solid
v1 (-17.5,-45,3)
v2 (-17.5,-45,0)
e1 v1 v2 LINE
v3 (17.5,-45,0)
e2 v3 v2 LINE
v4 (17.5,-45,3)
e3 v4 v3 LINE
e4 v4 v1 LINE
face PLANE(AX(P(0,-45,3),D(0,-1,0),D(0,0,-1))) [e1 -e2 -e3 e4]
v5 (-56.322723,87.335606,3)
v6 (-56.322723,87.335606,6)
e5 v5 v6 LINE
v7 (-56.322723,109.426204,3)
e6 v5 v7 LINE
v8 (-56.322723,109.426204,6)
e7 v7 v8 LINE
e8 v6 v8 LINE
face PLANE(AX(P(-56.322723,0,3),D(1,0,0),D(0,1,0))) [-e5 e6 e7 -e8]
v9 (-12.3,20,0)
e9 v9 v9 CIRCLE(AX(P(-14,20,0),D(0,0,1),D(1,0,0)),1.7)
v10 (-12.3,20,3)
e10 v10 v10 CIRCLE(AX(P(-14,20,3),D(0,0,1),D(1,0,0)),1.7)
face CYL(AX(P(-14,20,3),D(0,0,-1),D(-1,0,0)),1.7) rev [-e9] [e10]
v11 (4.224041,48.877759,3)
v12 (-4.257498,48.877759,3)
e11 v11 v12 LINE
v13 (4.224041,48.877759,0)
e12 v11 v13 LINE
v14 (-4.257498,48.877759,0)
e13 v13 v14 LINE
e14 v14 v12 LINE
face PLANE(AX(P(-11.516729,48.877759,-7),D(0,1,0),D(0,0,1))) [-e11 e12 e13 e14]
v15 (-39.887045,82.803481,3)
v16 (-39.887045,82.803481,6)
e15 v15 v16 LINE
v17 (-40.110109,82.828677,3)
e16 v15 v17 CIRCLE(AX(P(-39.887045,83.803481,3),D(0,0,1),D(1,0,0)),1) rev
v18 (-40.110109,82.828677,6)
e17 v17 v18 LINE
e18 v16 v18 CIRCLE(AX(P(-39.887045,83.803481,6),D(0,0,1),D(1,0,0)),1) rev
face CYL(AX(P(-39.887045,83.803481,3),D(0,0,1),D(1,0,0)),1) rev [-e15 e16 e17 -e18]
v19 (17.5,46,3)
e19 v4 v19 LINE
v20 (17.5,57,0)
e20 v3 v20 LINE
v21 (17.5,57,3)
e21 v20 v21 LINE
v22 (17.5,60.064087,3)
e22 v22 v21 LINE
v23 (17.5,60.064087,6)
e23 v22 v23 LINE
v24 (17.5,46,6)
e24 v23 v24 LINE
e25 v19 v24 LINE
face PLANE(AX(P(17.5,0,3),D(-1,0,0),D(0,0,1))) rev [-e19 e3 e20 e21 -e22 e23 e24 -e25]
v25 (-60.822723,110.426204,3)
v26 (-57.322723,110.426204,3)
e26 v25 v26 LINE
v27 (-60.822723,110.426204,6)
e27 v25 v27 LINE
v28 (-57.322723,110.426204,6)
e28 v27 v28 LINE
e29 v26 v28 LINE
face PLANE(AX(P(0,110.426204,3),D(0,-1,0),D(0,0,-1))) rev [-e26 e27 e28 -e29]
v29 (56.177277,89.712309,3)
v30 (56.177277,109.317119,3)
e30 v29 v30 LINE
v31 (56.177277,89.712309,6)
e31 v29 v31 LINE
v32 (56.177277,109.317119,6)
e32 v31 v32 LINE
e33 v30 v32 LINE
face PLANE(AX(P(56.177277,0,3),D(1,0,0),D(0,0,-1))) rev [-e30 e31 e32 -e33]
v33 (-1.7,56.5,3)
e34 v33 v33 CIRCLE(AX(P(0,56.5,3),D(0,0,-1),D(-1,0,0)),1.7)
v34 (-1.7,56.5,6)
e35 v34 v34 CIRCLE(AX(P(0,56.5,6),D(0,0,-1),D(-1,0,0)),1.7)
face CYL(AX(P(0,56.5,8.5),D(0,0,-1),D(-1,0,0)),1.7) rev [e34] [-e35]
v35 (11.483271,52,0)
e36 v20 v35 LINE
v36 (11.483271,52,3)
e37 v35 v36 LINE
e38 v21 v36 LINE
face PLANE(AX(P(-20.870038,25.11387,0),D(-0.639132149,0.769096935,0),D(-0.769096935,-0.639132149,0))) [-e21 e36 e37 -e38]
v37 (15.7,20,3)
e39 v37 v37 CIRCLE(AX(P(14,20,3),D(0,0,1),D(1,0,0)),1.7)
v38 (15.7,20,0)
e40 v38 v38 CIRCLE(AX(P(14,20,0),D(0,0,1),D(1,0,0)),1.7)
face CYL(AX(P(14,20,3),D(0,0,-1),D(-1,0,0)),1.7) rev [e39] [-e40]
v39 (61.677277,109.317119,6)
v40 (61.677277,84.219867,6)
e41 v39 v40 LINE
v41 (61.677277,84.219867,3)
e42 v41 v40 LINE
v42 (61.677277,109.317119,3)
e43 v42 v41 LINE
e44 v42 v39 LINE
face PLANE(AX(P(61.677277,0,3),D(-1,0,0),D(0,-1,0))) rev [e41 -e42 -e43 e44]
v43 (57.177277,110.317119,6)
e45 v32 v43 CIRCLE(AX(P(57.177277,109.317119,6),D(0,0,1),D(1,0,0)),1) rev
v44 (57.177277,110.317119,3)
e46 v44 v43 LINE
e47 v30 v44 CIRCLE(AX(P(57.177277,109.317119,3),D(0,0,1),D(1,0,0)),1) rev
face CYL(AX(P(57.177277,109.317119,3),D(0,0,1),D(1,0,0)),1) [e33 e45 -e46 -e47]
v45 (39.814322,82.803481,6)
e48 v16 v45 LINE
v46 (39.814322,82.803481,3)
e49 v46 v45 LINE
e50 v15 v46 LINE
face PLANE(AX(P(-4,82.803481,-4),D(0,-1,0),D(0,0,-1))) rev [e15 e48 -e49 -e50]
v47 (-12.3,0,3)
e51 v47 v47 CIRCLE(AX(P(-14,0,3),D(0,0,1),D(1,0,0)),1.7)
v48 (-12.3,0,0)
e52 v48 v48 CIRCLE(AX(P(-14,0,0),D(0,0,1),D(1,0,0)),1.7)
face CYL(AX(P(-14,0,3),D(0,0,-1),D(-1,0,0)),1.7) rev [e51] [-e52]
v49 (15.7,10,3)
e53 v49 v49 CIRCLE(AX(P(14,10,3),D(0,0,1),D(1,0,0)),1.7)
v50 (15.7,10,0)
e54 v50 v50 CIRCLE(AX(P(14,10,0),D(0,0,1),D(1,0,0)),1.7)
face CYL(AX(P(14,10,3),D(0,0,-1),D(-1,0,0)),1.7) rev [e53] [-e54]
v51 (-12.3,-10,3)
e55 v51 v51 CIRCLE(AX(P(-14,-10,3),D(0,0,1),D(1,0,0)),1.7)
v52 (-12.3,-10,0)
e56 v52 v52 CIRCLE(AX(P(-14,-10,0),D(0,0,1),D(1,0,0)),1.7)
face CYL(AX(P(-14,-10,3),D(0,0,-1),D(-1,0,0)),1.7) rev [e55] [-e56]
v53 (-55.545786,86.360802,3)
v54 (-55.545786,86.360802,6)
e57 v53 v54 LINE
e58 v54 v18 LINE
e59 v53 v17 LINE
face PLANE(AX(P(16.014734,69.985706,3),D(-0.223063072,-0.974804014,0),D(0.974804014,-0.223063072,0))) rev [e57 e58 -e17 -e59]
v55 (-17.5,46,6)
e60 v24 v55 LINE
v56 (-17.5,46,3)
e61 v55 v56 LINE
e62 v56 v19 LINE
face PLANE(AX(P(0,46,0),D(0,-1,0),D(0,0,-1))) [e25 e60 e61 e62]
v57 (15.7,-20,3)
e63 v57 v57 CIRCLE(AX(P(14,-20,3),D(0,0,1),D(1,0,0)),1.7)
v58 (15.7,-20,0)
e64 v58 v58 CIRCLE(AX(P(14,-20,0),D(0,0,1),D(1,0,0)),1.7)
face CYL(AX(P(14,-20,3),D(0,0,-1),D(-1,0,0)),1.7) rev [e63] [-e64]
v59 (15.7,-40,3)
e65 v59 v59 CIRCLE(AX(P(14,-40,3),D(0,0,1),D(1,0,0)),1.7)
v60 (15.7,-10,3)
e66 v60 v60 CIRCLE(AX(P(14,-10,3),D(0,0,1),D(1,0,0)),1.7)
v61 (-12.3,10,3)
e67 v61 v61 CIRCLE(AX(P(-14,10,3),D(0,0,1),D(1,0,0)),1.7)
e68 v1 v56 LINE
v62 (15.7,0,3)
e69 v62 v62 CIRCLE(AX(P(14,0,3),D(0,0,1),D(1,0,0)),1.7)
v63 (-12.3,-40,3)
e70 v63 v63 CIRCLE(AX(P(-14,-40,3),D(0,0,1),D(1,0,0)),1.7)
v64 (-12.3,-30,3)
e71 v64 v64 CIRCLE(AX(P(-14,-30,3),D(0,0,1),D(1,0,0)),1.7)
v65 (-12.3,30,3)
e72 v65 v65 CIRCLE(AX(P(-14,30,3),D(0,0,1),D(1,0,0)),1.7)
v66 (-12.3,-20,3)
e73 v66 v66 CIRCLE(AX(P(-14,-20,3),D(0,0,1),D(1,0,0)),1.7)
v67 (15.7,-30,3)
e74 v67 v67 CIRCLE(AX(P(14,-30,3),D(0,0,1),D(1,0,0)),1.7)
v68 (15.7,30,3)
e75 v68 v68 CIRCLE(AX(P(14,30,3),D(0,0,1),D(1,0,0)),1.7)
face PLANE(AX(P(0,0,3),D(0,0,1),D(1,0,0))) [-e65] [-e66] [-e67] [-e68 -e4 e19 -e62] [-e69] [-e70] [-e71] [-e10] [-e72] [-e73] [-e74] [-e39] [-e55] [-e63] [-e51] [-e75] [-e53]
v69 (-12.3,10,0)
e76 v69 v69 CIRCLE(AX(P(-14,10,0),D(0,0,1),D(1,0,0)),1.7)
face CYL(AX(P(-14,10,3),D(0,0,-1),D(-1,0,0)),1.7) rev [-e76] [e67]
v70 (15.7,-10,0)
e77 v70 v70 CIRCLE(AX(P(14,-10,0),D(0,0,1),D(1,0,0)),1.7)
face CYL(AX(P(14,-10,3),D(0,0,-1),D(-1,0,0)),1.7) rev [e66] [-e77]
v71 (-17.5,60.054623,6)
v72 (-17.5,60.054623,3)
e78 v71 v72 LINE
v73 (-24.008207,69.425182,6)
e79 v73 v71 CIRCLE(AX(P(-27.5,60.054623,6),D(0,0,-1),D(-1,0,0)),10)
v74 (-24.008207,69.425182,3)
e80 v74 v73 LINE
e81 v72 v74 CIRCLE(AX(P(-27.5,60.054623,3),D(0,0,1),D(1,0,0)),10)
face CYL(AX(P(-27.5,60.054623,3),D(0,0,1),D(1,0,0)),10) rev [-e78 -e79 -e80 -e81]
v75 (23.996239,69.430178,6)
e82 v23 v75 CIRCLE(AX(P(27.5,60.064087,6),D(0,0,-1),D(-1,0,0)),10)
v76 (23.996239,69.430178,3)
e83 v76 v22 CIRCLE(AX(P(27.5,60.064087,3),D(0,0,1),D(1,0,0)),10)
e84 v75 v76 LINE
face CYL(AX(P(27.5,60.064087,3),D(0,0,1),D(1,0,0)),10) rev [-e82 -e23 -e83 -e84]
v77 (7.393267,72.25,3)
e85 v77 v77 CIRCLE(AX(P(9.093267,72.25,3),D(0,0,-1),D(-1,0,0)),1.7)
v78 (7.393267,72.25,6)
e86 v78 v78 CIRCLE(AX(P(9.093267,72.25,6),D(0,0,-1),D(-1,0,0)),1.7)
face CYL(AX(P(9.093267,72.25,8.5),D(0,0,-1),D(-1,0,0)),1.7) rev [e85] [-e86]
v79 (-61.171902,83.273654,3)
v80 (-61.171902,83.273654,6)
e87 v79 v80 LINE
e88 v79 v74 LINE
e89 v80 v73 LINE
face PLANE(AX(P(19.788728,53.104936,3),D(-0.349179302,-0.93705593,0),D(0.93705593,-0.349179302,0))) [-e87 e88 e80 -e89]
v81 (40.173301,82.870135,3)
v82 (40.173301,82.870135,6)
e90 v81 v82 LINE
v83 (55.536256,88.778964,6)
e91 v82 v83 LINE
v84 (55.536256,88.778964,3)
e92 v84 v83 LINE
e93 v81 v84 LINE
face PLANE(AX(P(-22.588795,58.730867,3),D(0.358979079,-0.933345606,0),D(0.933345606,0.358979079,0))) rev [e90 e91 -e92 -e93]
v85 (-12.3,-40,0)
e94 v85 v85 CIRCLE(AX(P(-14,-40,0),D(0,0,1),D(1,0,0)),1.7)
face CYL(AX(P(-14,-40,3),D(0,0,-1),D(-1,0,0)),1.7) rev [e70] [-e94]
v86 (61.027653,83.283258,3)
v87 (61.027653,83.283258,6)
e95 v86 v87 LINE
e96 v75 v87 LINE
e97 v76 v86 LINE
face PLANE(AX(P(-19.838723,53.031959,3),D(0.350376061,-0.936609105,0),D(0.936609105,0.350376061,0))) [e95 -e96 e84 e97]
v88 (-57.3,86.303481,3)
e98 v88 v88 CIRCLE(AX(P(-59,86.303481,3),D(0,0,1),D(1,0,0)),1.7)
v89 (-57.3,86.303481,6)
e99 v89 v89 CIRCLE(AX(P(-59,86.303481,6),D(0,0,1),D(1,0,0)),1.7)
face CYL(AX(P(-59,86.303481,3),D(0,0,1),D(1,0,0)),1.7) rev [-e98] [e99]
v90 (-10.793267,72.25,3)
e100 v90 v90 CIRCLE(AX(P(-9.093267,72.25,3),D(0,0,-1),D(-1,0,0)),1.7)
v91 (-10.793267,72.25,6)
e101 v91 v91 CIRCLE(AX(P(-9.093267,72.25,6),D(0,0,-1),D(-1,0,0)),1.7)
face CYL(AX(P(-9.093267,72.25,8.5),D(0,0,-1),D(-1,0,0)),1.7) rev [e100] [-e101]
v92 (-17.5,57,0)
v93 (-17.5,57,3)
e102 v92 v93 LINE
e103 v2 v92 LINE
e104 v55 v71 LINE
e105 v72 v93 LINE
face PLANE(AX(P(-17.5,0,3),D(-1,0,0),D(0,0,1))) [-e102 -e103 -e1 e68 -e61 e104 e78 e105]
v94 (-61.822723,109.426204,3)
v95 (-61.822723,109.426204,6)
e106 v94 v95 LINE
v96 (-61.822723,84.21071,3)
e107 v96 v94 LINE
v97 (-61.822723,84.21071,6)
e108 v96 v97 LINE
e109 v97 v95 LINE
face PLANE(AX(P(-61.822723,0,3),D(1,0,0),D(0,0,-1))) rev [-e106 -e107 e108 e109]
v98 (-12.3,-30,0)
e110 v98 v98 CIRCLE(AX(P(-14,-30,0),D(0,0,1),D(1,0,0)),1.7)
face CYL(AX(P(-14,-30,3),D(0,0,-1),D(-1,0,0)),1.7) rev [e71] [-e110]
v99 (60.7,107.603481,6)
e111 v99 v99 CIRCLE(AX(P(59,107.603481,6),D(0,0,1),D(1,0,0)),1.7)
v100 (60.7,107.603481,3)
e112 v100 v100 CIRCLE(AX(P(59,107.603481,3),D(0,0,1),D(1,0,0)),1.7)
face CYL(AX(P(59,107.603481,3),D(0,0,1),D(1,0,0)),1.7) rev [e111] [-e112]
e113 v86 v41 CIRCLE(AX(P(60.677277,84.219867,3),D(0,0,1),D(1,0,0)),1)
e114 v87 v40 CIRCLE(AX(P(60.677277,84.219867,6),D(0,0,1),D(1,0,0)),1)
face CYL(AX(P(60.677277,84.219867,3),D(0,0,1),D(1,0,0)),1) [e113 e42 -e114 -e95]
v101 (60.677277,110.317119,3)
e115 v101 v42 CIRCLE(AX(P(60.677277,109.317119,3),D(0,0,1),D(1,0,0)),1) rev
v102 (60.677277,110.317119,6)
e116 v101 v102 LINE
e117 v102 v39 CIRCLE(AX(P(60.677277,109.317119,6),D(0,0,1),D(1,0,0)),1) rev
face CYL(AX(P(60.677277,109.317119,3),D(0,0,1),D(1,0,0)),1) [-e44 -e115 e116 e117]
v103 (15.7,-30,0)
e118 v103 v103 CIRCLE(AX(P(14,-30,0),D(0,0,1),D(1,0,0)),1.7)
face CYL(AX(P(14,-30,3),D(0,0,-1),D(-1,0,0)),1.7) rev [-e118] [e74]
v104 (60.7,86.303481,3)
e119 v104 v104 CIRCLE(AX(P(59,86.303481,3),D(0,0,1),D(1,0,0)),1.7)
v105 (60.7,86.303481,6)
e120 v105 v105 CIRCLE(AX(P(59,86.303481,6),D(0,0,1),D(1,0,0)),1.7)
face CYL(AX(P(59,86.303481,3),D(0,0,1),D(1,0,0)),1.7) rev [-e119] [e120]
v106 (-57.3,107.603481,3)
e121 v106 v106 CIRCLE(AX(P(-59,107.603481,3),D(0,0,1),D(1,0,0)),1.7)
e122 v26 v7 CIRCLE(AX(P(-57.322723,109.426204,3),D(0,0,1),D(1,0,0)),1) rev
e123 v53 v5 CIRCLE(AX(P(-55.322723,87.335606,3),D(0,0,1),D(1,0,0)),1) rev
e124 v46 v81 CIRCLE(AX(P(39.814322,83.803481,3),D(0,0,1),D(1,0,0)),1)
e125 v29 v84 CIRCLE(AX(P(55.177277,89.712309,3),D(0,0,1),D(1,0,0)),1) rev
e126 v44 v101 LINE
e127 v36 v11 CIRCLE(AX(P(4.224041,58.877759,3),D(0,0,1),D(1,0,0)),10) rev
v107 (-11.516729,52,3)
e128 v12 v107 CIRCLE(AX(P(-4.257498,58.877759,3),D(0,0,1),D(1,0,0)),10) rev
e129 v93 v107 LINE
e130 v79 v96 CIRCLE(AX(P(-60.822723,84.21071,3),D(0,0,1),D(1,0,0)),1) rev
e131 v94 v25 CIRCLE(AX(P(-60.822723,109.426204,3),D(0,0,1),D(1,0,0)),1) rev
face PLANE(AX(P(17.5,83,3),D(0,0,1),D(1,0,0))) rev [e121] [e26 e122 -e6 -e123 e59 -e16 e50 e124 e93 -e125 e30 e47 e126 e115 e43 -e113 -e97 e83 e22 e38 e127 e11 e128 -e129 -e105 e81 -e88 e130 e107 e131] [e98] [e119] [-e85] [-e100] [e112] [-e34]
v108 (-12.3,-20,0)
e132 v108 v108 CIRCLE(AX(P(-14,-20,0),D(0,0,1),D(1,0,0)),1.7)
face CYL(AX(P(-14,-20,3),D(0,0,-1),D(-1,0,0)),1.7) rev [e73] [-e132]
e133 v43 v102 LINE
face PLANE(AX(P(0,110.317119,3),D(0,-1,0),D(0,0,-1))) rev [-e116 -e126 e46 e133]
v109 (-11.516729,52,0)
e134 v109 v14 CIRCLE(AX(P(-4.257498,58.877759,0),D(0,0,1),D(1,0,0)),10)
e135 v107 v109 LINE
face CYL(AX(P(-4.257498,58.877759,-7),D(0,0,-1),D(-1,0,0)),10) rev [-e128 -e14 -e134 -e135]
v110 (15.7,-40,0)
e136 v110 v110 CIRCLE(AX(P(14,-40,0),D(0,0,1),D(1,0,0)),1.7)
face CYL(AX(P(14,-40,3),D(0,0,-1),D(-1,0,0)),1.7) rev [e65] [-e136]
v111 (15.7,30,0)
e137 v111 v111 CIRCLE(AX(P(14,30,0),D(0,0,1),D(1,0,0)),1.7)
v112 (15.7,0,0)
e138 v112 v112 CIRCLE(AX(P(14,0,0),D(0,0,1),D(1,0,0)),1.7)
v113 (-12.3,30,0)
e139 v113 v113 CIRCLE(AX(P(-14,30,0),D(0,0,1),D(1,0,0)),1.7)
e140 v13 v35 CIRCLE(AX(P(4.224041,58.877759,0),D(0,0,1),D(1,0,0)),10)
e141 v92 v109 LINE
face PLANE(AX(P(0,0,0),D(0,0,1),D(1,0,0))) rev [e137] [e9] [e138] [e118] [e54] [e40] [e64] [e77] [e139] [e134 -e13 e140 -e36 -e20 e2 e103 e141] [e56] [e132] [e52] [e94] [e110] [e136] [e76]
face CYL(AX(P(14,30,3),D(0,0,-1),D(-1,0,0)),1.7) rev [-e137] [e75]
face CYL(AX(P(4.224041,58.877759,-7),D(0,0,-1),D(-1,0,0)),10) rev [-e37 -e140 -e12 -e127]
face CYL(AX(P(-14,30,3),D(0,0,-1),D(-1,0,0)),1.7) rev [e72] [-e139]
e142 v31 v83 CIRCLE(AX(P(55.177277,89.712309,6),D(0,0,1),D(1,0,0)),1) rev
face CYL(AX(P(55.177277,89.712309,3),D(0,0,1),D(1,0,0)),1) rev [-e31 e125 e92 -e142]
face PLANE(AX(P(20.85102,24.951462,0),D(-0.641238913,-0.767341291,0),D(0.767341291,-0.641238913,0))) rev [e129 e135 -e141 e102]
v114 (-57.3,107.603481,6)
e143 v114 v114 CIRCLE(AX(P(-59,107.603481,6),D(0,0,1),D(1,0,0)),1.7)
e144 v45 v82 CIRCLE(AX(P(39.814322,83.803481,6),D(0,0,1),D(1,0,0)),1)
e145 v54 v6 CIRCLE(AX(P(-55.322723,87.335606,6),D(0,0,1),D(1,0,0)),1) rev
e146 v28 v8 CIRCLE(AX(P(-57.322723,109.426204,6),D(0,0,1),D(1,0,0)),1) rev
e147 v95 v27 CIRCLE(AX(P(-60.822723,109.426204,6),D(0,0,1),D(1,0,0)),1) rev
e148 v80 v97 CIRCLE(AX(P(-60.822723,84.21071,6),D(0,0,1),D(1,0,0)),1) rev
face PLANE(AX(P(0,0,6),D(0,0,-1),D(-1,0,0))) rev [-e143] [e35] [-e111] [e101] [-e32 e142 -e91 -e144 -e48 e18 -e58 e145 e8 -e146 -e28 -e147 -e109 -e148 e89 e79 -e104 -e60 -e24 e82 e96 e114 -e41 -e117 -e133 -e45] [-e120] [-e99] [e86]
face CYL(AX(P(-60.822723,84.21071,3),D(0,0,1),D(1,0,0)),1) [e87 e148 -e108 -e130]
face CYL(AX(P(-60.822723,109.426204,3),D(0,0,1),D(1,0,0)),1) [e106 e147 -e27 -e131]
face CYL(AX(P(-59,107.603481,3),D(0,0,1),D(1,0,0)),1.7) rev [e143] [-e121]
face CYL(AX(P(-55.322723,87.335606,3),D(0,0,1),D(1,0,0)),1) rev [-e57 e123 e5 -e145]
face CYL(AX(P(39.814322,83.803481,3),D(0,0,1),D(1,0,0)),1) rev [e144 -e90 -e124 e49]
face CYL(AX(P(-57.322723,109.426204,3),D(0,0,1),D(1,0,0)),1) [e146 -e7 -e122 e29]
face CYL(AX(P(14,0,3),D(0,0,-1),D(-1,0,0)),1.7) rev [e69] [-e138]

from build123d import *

# Parameters (mm, degrees)
SKETCH2_W                = 90
SKETCH2_H                = 35
SKETCH2_R                = 1.7
BOSS_EXTRUDE1_DEPTH      = 3
SKETCH3_W                = 35
SKETCH3_H                = 2
BOSS_EXTRUDE2_DEPTH      = 8
BOSS_EXTRUDE4_DEPTH      = 1
BOSS_EXTRUDE4_DEPTH_BACK = 5
SKETCH5_W                = 35
SKETCH5_H                = 8
SKETCH6_W                = 35
SKETCH6_H                = 3
BOSS_EXTRUDE5_DEPTH      = 30
FILLET6_R                = 16
SKETCH7_R                = 1.7
CUT_EXTRUDE1_DEPTH       = 5.5
BOSS_EXTRUDE8_DEPTH      = 5.3
BOSS_EXTRUDE8_DEPTH_BACK = 1
SKETCH9_W                = 8
SKETCH9_H                = 3
SKETCH12_R               = 1.7
BOSS_EXTRUDE10_DEPTH     = 3
SKETCH13_W               = 35
SKETCH13_H               = 3
CUT_EXTRUDE2_DEPTH       = 1
SKETCH16_W               = 35
SKETCH16_H               = 3
CUT_EXTRUDE3_DEPTH       = 1
SKETCH17_W               = 23
SKETCH17_H               = 3.7
CUT_EXTRUDE4_DEPTH       = 10
CUT_EXTRUDE5_DEPTH       = 10
SKETCH19_R               = 1.7
BOSS_EXTRUDE14_DEPTH     = 3
FILLET7_R                = 10
FILLET8_R                = 10
BOSS_EXTRUDE15_DEPTH     = 3
FILLET9_R                = 10
FILLET10_R               = 10


with BuildPart() as part:
    # Sketch2 → Boss-Extrude1 (new body)
    with BuildSketch(Plane(origin=(0, 0, 0), x_dir=(0, 1, 0), z_dir=(0, 0, 1))):
        Rectangle(SKETCH2_W, SKETCH2_H)
        with Locations(Location((30, 14, 0), (0, 0, 270))):
            Circle(SKETCH2_R, mode=Mode.SUBTRACT)
        with Locations(Location((30, -14, 0), (0, 0, 270))):
            Circle(SKETCH2_R, mode=Mode.SUBTRACT)
        with Locations(Location((20, -14, 0), (0, 0, 270))):
            Circle(SKETCH2_R, mode=Mode.SUBTRACT)
        with Locations(Location((10, -14, 0), (0, 0, 270))):
            Circle(SKETCH2_R, mode=Mode.SUBTRACT)
        with Locations(Location((0, -14, 0), (0, 0, 270))):
            Circle(SKETCH2_R, mode=Mode.SUBTRACT)
        with Locations(Location((-10, -14, 0), (0, 0, 270))):
            Circle(SKETCH2_R, mode=Mode.SUBTRACT)
        with Locations(Location((-20, -14, 0), (0, 0, 270))):
            Circle(SKETCH2_R, mode=Mode.SUBTRACT)
        with Locations(Location((20, 14, 0), (0, 0, 270))):
            Circle(SKETCH2_R, mode=Mode.SUBTRACT)
        with Locations(Location((10, 14, 0), (0, 0, 270))):
            Circle(SKETCH2_R, mode=Mode.SUBTRACT)
        with Locations(Location((0, 14, 0), (0, 0, 270))):
            Circle(SKETCH2_R, mode=Mode.SUBTRACT)
        with Locations(Location((-10, 14, 0), (0, 0, 270))):
            Circle(SKETCH2_R, mode=Mode.SUBTRACT)
        with Locations(Location((-20, 14, 0), (0, 0, 270))):
            Circle(SKETCH2_R, mode=Mode.SUBTRACT)
        with Locations(Location((-30, -14, 0), (0, 0, 270))):
            Circle(SKETCH2_R, mode=Mode.SUBTRACT)
        with Locations(Location((-30, 14, 0), (0, 0, 270))):
            Circle(SKETCH2_R, mode=Mode.SUBTRACT)
        with Locations(Location((-40, -14, 0), (0, 0, 270))):
            Circle(SKETCH2_R, mode=Mode.SUBTRACT)
        with Locations(Location((-40, 14, 0), (0, 0, 270))):
            Circle(SKETCH2_R, mode=Mode.SUBTRACT)
    extrude(amount=BOSS_EXTRUDE1_DEPTH)

    # Sketch3 → Boss-Extrude2 (add)
    with BuildSketch(Plane(origin=(0, 45, 0), x_dir=(-1, 0, 0), z_dir=(0, 1, 0))):
        with Locations((0, 2)):
            Rectangle(SKETCH3_W, SKETCH3_H)
    extrude(amount=BOSS_EXTRUDE2_DEPTH)

    # Sketch5 → Boss-Extrude4 (add, two sides: drawn at the far end of the back side and taken through both)
    with BuildSketch(Plane(origin=(0, 0, 1), x_dir=(1, 0, 0), z_dir=(0, 0, -1)).offset(-BOSS_EXTRUDE4_DEPTH_BACK)):
        with Locations((0, -49)):
            Rectangle(SKETCH5_W, SKETCH5_H)
    extrude(amount=BOSS_EXTRUDE4_DEPTH + BOSS_EXTRUDE4_DEPTH_BACK)

    # Sketch6 → Boss-Extrude5 (add)
    with BuildSketch(Plane(origin=(0, 53, 0), x_dir=(-1, 0, 0), z_dir=(0, 1, 0))):
        with Locations((0, 4.5)):
            Rectangle(SKETCH6_W, SKETCH6_H)
    extrude(amount=BOSS_EXTRUDE5_DEPTH)

    # Fillet6
    fillet6_edges = [part.edges().sort_by_distance(p)[0] for p in [
        (17.5, 83, 4.5),
        (-17.5, 83, 4.5),
    ]]
    fillet(fillet6_edges, radius=FILLET6_R)

    # Sketch7 → Cut-Extrude1 (cut)
    with BuildSketch(Plane(origin=(0, 0, 3), x_dir=(1, 0, 0), z_dir=(0, 0, -1))):
        with Locations(Location((0, -56.5, 0), (0, 0, 180))):
            Circle(SKETCH7_R)
        with Locations(Location((9.09326674, -72.25, 0), (0, 0, 180))):
            Circle(SKETCH7_R)
        with Locations(Location((-9.09326674, -72.25, 0), (0, 0, 180))):
            Circle(SKETCH7_R)
    extrude(amount=-CUT_EXTRUDE1_DEPTH, mode=Mode.SUBTRACT)

    # Sketch9 → Boss-Extrude8 (add, two sides: drawn at the far end of the back side and taken through both)
    with BuildSketch(Plane(origin=(0, 83, 0), x_dir=(-1, 0, 0), z_dir=(0, 1, 0)).offset(-BOSS_EXTRUDE8_DEPTH_BACK)):
        with Locations((0, 4.5)):
            Rectangle(SKETCH9_W, SKETCH9_H)
    extrude(amount=BOSS_EXTRUDE8_DEPTH + BOSS_EXTRUDE8_DEPTH_BACK)

    # Sketch12 → Boss-Extrude10 (add)
    with BuildSketch(Plane.XY.offset(6)):
        with BuildLine():
            Line((-4, 88.3), (4, 88.3))
            Line((4, 88.3), (34, 88.3))
            Line((34, 88.3), (55.311718973, 89.617849804))
            ThreePointArc((55.311718973, 89.617849804), (55.978601048, 89.931005043), (56.25, 90.615943371))
            Line((56.25, 90.615943371), (56.25, 105.475870157))
            Line((56.25, 105.475870157), (56.25, 109.975870157))
            ThreePointArc((56.25, 109.975870157), (56.542893219, 110.682976939), (57.25, 110.975870157))
            Line((57.25, 110.975870157), (60.75, 110.975870157))
            ThreePointArc((60.75, 110.975870157), (61.457106781, 110.682976939), (61.75, 109.975870157))
            Line((61.75, 109.975870157), (61.75, 105.475870157))
            Line((61.75, 105.475870157), (61.75, 89.675870157))
            Line((61.75, 89.675870157), (61.75, 85.175870157))
            ThreePointArc((61.75, 85.175870157), (61.457106781, 84.468763376), (60.75, 84.175870157))
            Line((60.75, 84.175870157), (56.25, 84.175870157))
            Line((56.25, 84.175870157), (34, 82.803480629))
            Line((34, 82.803480629), (4, 82.803480629))
            Line((4, 82.803480629), (-4, 82.803480629))
            Line((-4, 82.803480629), (-33.969189063, 82.803480629))
            ThreePointArc((-33.969189063, 82.803480629), (-33.999985386, 82.803954949), (-34.030752494, 82.805377456))
            Line((-34.030752494, 82.805377456), (-56.25, 84.175870157))
            Line((-56.25, 84.175870157), (-60.75, 84.175870157))
            ThreePointArc((-60.75, 84.175870157), (-61.457106781, 84.468763376), (-61.75, 85.175870157))
            Line((-61.75, 85.175870157), (-61.75, 89.675870157))
            Line((-61.75, 89.675870157), (-61.75, 105.475870157))
            Line((-61.75, 105.475870157), (-61.75, 109.975870157))
            ThreePointArc((-61.75, 109.975870157), (-61.457106781, 110.682976939), (-60.75, 110.975870157))
            Line((-60.75, 110.975870157), (-57.25, 110.975870157))
            ThreePointArc((-57.25, 110.975870157), (-56.542893219, 110.682976939), (-56.25, 109.975870157))
            Line((-56.25, 109.975870157), (-56.25, 105.475870157))
            Line((-56.25, 105.475870157), (-56.25, 90.615943371))
            ThreePointArc((-56.25, 90.615943371), (-55.978601048, 89.931005043), (-55.311718973, 89.617849804))
            Line((-55.311718973, 89.617849804), (-34, 88.3))
            Line((-34, 88.3), (-4, 88.3))
        make_face()
        with Locations((-59, 86.925870157)):
            Circle(SKETCH12_R, mode=Mode.SUBTRACT)
        with Locations((59, 86.925870157)):
            Circle(SKETCH12_R, mode=Mode.SUBTRACT)
        with Locations((-59, 108.225870157)):
            Circle(SKETCH12_R, mode=Mode.SUBTRACT)
        with Locations((59, 108.225870157)):
            Circle(SKETCH12_R, mode=Mode.SUBTRACT)
    extrude(amount=-BOSS_EXTRUDE10_DEPTH)

    # Sketch13 → Cut-Extrude2 (cut)
    with BuildSketch(Plane.XZ.offset(-45)):
        with Locations((0, 4.5)):
            Rectangle(SKETCH13_W, SKETCH13_H)
    extrude(amount=-CUT_EXTRUDE2_DEPTH, mode=Mode.SUBTRACT)

    # Sketch16 → Cut-Extrude3 (cut)
    with BuildSketch(Plane(origin=(0, 53, 0), x_dir=(-1, 0, 0), z_dir=(0, 1, 0))):
        with Locations((0, 1.5)):
            Rectangle(SKETCH16_W, SKETCH16_H)
    extrude(amount=-CUT_EXTRUDE3_DEPTH, mode=Mode.SUBTRACT)

    # Sketch17 → Cut-Extrude4 (cut)
    with BuildSketch(Plane(origin=(0, 0, 3), x_dir=(1, 0, 0), z_dir=(0, 0, -1))):
        with Locations((-0.016728592, -50.727758944)):
            Rectangle(SKETCH17_W, SKETCH17_H)
    extrude(amount=CUT_EXTRUDE4_DEPTH, mode=Mode.SUBTRACT)

    # Sketch18 → Cut-Extrude5 (cut)
    with BuildSketch(Plane.XY.offset(6)):
        with BuildLine():
            Line((-4, 82.803480629), (-33.969189063, 82.803480629))
            ThreePointArc((-33.969189063, 82.803480629), (-33.999985386, 82.803954949), (-34.030752494, 82.805377456))
            Line((-34.030752494, 82.805377456), (-56.25, 84.175870157))
            Line((-56.25, 84.175870157), (-60.75, 84.175870157))
            ThreePointArc((-60.75, 84.175870157), (-61.457106781, 84.468763376), (-61.75, 85.175870157))
            Line((-61.75, 85.175870157), (-61.75, 109.975870157))
            ThreePointArc((-61.75, 109.975870157), (-61.457106781, 110.682976939), (-60.75, 110.975870157))
            Line((-60.75, 110.975870157), (-57.25, 110.975870157))
            ThreePointArc((-57.25, 110.975870157), (-56.542893219, 110.682976939), (-56.25, 109.975870157))
            Line((-56.25, 109.975870157), (-56.25, 90.615943371))
            ThreePointArc((-56.25, 90.615943371), (-55.978601048, 89.931005043), (-55.311718973, 89.617849804))
            Line((-55.311718973, 89.617849804), (-34, 88.3))
            Line((-34, 88.3), (34, 88.3))
            Line((34, 88.3), (55.311718973, 89.617849804))
            ThreePointArc((55.311718973, 89.617849804), (55.978601048, 89.931005043), (56.25, 90.615943371))
            Line((56.25, 90.615943371), (56.25, 109.975870157))
            ThreePointArc((56.25, 109.975870157), (56.542893219, 110.682976939), (57.25, 110.975870157))
            Line((57.25, 110.975870157), (60.75, 110.975870157))
            ThreePointArc((60.75, 110.975870157), (61.457106781, 110.682976939), (61.75, 109.975870157))
            Line((61.75, 109.975870157), (61.75, 85.175870157))
            ThreePointArc((61.75, 85.175870157), (61.457106781, 84.468763376), (60.75, 84.175870157))
            Line((60.75, 84.175870157), (56.25, 84.175870157))
            Line((56.25, 84.175870157), (34, 82.803480629))
            Line((34, 82.803480629), (4, 82.803480629))
            Line((4, 82.803480629), (-4, 82.803480629))
        make_face()
    extrude(amount=-CUT_EXTRUDE5_DEPTH, mode=Mode.SUBTRACT)

    # Sketch19 → Boss-Extrude14 (add)
    # profile 1 of 3: a face of its own
    with BuildSketch(Plane.XY.offset(6)):
        with BuildLine():
            ThreePointArc((-17.5, 67), (-13.665525061, 77.392304845), (-4, 82.803480629))
            Line((-4, 82.803480629), (-39.887045463, 82.803480629))
            ThreePointArc((-39.887045463, 82.803480629), (-39.999286245, 82.80979959), (-40.110108536, 82.828676615))
            Line((-40.110108536, 82.828676615), (-55.545786191, 86.360801669))
            ThreePointArc((-55.545786191, 86.360801669), (-56.104727937, 86.7123333), (-56.322723119, 87.335605683))
            Line((-56.322723119, 87.335605683), (-56.322723119, 104.926203748))
            Line((-56.322723119, 104.926203748), (-56.322723119, 109.426203748))
            ThreePointArc((-56.322723119, 109.426203748), (-56.615616338, 110.133310529), (-57.322723119, 110.426203748))
            Line((-57.322723119, 110.426203748), (-60.822723119, 110.426203748))
            ThreePointArc((-60.822723119, 110.426203748), (-61.5298299, 110.133310529), (-61.822723119, 109.426203748))
            Line((-61.822723119, 109.426203748), (-61.822723119, 104.81711907))
            Line((-61.822723119, 104.81711907), (-61.822723119, 89.01711907))
            Line((-61.822723119, 89.01711907), (-61.822723119, 84.210710383))
            ThreePointArc((-61.822723119, 84.210710383), (-61.644057187, 83.640262884), (-61.171902421, 83.273654454))
            Line((-61.171902421, 83.273654454), (-17.5, 67))
        make_face()
        with Locations((-59, 86.303480629)):
            Circle(SKETCH19_R, mode=Mode.SUBTRACT)
        with Locations((-59, 107.603480629)):
            Circle(SKETCH19_R, mode=Mode.SUBTRACT)
    # profile 2 of 3: a face of its own
    with BuildSketch(Plane.XY.offset(6)):
        with BuildLine():
            Line((-17.5, 67), (-9.634621245, 74.865378755))
            Line((-9.634621245, 74.865378755), (9.634621245, 74.865378755))
            Line((9.634621245, 74.865378755), (17.5, 67))
            ThreePointArc((17.5, 67), (13.665525061, 77.392304845), (4, 82.803480629))
            Line((4, 82.803480629), (-4, 82.803480629))
            ThreePointArc((-4, 82.803480629), (-13.665525061, 77.392304845), (-17.5, 67))
        make_face()
    # profile 3 of 3: a face of its own
    with BuildSketch(Plane.XY.offset(6)):
        with BuildLine():
            Line((39.814322345, 82.803480629), (4, 82.803480629))
            ThreePointArc((4, 82.803480629), (13.665525061, 77.392304845), (17.5, 67))
            Line((17.5, 67), (61.027652942, 83.283257849))
            ThreePointArc((61.027652942, 83.283257849), (61.498975141, 83.649944179), (61.677276881, 84.219866954))
            Line((61.677276881, 84.219866954), (61.677276881, 89.026275641))
            Line((61.677276881, 89.026275641), (61.677276881, 104.81711907))
            Line((61.677276881, 104.81711907), (61.677276881, 109.31711907))
            ThreePointArc((61.677276881, 109.31711907), (61.384383662, 110.024225851), (60.677276881, 110.31711907))
            Line((60.677276881, 110.31711907), (57.177276881, 110.31711907))
            ThreePointArc((57.177276881, 110.31711907), (56.4701701, 110.024225851), (56.177276881, 109.31711907))
            Line((56.177276881, 109.31711907), (56.177276881, 104.81711907))
            Line((56.177276881, 104.81711907), (56.177276881, 89.712309297))
            ThreePointArc((56.177276881, 89.712309297), (56.001588436, 89.146172865), (55.53625596, 88.778963691))
            Line((55.53625596, 88.778963691), (40.173301424, 82.870135023))
            ThreePointArc((40.173301424, 82.870135023), (39.996879724, 82.820285428), (39.814322345, 82.803480629))
        make_face()
        with Locations((59, 86.303480629)):
            Circle(SKETCH19_R, mode=Mode.SUBTRACT)
        with Locations((59, 107.603480629)):
            Circle(SKETCH19_R, mode=Mode.SUBTRACT)
    extrude(amount=-BOSS_EXTRUDE14_DEPTH)

    # Fillet7
    fillet7_edges = [part.edges().sort_by_distance(p)[0] for p in [
        (-17.5, 67, 4.5),
    ]]
    fillet(fillet7_edges, radius=FILLET7_R)

    # Fillet8
    fillet8_edges = [part.edges().sort_by_distance(p)[0] for p in [
        (17.5, 67, 4.5),
    ]]
    fillet(fillet8_edges, radius=FILLET8_R)

    # Sketch21 → Boss-Extrude15 (add)
    with BuildSketch(Plane(origin=(0, 0, 3), x_dir=(1, 0, 0), z_dir=(0, 0, -1))):
        Polygon((-11.516728592, -52), (-17.5, -52), (-17.5, -57), align=None)
        Polygon((17.5, -57), (17.5, -52), (11.483271408, -52), align=None)
    extrude(amount=BOSS_EXTRUDE15_DEPTH)

    # Fillet9
    # the kernel refuses this fillet: 10 mm, written as the material it adds along each edge
    with BuildSketch(Plane(origin=(-11.516728592, 48.877758944, 3), x_dir=(1, 0, 0), z_dir=(0, 0, -1))) as fillet9_piece_1:
        with BuildLine():
            CenterArc((7.259230807, -10), FILLET9_R, 90, 46.54569152)
            Line((0, -3.122241056), (-0.145184616, -2.984685877))
            ThreePointArc((-0.145184616, -2.984685877), (-0.2, -1.561120528), (-0.2, 0))
            Line((-0.2, 0), (0, 0.2))
            Line((0, 0.2), (7.259230807, 0.2))
            Line((7.259230807, 0.2), (7.259230807, 0))
        make_face()
    extrude(amount=3)

    # Fillet10
    # the kernel refuses this fillet: 10 mm, written as the material it adds along each edge
    with BuildSketch(Plane(origin=(11.483271408, 48.877758944, 3), x_dir=(-1, 0, 0), z_dir=(0, 0, -1))) as fillet10_piece_1:
        with BuildLine():
            CenterArc((7.259230807, 10), FILLET10_R, 223.45430848, 46.54569152)
            Line((0, 3.122241056), (-0.145184616, 2.984685877))
            ThreePointArc((-0.145184616, 2.984685877), (-0.2, 1.561120528), (-0.2, 0))
            Line((-0.2, 0), (0, -0.2))
            Line((0, -0.2), (7.259230807, -0.2))
            Line((7.259230807, -0.2), (7.259230807, 0))
        make_face()
    extrude(amount=3)


solid = part.part
